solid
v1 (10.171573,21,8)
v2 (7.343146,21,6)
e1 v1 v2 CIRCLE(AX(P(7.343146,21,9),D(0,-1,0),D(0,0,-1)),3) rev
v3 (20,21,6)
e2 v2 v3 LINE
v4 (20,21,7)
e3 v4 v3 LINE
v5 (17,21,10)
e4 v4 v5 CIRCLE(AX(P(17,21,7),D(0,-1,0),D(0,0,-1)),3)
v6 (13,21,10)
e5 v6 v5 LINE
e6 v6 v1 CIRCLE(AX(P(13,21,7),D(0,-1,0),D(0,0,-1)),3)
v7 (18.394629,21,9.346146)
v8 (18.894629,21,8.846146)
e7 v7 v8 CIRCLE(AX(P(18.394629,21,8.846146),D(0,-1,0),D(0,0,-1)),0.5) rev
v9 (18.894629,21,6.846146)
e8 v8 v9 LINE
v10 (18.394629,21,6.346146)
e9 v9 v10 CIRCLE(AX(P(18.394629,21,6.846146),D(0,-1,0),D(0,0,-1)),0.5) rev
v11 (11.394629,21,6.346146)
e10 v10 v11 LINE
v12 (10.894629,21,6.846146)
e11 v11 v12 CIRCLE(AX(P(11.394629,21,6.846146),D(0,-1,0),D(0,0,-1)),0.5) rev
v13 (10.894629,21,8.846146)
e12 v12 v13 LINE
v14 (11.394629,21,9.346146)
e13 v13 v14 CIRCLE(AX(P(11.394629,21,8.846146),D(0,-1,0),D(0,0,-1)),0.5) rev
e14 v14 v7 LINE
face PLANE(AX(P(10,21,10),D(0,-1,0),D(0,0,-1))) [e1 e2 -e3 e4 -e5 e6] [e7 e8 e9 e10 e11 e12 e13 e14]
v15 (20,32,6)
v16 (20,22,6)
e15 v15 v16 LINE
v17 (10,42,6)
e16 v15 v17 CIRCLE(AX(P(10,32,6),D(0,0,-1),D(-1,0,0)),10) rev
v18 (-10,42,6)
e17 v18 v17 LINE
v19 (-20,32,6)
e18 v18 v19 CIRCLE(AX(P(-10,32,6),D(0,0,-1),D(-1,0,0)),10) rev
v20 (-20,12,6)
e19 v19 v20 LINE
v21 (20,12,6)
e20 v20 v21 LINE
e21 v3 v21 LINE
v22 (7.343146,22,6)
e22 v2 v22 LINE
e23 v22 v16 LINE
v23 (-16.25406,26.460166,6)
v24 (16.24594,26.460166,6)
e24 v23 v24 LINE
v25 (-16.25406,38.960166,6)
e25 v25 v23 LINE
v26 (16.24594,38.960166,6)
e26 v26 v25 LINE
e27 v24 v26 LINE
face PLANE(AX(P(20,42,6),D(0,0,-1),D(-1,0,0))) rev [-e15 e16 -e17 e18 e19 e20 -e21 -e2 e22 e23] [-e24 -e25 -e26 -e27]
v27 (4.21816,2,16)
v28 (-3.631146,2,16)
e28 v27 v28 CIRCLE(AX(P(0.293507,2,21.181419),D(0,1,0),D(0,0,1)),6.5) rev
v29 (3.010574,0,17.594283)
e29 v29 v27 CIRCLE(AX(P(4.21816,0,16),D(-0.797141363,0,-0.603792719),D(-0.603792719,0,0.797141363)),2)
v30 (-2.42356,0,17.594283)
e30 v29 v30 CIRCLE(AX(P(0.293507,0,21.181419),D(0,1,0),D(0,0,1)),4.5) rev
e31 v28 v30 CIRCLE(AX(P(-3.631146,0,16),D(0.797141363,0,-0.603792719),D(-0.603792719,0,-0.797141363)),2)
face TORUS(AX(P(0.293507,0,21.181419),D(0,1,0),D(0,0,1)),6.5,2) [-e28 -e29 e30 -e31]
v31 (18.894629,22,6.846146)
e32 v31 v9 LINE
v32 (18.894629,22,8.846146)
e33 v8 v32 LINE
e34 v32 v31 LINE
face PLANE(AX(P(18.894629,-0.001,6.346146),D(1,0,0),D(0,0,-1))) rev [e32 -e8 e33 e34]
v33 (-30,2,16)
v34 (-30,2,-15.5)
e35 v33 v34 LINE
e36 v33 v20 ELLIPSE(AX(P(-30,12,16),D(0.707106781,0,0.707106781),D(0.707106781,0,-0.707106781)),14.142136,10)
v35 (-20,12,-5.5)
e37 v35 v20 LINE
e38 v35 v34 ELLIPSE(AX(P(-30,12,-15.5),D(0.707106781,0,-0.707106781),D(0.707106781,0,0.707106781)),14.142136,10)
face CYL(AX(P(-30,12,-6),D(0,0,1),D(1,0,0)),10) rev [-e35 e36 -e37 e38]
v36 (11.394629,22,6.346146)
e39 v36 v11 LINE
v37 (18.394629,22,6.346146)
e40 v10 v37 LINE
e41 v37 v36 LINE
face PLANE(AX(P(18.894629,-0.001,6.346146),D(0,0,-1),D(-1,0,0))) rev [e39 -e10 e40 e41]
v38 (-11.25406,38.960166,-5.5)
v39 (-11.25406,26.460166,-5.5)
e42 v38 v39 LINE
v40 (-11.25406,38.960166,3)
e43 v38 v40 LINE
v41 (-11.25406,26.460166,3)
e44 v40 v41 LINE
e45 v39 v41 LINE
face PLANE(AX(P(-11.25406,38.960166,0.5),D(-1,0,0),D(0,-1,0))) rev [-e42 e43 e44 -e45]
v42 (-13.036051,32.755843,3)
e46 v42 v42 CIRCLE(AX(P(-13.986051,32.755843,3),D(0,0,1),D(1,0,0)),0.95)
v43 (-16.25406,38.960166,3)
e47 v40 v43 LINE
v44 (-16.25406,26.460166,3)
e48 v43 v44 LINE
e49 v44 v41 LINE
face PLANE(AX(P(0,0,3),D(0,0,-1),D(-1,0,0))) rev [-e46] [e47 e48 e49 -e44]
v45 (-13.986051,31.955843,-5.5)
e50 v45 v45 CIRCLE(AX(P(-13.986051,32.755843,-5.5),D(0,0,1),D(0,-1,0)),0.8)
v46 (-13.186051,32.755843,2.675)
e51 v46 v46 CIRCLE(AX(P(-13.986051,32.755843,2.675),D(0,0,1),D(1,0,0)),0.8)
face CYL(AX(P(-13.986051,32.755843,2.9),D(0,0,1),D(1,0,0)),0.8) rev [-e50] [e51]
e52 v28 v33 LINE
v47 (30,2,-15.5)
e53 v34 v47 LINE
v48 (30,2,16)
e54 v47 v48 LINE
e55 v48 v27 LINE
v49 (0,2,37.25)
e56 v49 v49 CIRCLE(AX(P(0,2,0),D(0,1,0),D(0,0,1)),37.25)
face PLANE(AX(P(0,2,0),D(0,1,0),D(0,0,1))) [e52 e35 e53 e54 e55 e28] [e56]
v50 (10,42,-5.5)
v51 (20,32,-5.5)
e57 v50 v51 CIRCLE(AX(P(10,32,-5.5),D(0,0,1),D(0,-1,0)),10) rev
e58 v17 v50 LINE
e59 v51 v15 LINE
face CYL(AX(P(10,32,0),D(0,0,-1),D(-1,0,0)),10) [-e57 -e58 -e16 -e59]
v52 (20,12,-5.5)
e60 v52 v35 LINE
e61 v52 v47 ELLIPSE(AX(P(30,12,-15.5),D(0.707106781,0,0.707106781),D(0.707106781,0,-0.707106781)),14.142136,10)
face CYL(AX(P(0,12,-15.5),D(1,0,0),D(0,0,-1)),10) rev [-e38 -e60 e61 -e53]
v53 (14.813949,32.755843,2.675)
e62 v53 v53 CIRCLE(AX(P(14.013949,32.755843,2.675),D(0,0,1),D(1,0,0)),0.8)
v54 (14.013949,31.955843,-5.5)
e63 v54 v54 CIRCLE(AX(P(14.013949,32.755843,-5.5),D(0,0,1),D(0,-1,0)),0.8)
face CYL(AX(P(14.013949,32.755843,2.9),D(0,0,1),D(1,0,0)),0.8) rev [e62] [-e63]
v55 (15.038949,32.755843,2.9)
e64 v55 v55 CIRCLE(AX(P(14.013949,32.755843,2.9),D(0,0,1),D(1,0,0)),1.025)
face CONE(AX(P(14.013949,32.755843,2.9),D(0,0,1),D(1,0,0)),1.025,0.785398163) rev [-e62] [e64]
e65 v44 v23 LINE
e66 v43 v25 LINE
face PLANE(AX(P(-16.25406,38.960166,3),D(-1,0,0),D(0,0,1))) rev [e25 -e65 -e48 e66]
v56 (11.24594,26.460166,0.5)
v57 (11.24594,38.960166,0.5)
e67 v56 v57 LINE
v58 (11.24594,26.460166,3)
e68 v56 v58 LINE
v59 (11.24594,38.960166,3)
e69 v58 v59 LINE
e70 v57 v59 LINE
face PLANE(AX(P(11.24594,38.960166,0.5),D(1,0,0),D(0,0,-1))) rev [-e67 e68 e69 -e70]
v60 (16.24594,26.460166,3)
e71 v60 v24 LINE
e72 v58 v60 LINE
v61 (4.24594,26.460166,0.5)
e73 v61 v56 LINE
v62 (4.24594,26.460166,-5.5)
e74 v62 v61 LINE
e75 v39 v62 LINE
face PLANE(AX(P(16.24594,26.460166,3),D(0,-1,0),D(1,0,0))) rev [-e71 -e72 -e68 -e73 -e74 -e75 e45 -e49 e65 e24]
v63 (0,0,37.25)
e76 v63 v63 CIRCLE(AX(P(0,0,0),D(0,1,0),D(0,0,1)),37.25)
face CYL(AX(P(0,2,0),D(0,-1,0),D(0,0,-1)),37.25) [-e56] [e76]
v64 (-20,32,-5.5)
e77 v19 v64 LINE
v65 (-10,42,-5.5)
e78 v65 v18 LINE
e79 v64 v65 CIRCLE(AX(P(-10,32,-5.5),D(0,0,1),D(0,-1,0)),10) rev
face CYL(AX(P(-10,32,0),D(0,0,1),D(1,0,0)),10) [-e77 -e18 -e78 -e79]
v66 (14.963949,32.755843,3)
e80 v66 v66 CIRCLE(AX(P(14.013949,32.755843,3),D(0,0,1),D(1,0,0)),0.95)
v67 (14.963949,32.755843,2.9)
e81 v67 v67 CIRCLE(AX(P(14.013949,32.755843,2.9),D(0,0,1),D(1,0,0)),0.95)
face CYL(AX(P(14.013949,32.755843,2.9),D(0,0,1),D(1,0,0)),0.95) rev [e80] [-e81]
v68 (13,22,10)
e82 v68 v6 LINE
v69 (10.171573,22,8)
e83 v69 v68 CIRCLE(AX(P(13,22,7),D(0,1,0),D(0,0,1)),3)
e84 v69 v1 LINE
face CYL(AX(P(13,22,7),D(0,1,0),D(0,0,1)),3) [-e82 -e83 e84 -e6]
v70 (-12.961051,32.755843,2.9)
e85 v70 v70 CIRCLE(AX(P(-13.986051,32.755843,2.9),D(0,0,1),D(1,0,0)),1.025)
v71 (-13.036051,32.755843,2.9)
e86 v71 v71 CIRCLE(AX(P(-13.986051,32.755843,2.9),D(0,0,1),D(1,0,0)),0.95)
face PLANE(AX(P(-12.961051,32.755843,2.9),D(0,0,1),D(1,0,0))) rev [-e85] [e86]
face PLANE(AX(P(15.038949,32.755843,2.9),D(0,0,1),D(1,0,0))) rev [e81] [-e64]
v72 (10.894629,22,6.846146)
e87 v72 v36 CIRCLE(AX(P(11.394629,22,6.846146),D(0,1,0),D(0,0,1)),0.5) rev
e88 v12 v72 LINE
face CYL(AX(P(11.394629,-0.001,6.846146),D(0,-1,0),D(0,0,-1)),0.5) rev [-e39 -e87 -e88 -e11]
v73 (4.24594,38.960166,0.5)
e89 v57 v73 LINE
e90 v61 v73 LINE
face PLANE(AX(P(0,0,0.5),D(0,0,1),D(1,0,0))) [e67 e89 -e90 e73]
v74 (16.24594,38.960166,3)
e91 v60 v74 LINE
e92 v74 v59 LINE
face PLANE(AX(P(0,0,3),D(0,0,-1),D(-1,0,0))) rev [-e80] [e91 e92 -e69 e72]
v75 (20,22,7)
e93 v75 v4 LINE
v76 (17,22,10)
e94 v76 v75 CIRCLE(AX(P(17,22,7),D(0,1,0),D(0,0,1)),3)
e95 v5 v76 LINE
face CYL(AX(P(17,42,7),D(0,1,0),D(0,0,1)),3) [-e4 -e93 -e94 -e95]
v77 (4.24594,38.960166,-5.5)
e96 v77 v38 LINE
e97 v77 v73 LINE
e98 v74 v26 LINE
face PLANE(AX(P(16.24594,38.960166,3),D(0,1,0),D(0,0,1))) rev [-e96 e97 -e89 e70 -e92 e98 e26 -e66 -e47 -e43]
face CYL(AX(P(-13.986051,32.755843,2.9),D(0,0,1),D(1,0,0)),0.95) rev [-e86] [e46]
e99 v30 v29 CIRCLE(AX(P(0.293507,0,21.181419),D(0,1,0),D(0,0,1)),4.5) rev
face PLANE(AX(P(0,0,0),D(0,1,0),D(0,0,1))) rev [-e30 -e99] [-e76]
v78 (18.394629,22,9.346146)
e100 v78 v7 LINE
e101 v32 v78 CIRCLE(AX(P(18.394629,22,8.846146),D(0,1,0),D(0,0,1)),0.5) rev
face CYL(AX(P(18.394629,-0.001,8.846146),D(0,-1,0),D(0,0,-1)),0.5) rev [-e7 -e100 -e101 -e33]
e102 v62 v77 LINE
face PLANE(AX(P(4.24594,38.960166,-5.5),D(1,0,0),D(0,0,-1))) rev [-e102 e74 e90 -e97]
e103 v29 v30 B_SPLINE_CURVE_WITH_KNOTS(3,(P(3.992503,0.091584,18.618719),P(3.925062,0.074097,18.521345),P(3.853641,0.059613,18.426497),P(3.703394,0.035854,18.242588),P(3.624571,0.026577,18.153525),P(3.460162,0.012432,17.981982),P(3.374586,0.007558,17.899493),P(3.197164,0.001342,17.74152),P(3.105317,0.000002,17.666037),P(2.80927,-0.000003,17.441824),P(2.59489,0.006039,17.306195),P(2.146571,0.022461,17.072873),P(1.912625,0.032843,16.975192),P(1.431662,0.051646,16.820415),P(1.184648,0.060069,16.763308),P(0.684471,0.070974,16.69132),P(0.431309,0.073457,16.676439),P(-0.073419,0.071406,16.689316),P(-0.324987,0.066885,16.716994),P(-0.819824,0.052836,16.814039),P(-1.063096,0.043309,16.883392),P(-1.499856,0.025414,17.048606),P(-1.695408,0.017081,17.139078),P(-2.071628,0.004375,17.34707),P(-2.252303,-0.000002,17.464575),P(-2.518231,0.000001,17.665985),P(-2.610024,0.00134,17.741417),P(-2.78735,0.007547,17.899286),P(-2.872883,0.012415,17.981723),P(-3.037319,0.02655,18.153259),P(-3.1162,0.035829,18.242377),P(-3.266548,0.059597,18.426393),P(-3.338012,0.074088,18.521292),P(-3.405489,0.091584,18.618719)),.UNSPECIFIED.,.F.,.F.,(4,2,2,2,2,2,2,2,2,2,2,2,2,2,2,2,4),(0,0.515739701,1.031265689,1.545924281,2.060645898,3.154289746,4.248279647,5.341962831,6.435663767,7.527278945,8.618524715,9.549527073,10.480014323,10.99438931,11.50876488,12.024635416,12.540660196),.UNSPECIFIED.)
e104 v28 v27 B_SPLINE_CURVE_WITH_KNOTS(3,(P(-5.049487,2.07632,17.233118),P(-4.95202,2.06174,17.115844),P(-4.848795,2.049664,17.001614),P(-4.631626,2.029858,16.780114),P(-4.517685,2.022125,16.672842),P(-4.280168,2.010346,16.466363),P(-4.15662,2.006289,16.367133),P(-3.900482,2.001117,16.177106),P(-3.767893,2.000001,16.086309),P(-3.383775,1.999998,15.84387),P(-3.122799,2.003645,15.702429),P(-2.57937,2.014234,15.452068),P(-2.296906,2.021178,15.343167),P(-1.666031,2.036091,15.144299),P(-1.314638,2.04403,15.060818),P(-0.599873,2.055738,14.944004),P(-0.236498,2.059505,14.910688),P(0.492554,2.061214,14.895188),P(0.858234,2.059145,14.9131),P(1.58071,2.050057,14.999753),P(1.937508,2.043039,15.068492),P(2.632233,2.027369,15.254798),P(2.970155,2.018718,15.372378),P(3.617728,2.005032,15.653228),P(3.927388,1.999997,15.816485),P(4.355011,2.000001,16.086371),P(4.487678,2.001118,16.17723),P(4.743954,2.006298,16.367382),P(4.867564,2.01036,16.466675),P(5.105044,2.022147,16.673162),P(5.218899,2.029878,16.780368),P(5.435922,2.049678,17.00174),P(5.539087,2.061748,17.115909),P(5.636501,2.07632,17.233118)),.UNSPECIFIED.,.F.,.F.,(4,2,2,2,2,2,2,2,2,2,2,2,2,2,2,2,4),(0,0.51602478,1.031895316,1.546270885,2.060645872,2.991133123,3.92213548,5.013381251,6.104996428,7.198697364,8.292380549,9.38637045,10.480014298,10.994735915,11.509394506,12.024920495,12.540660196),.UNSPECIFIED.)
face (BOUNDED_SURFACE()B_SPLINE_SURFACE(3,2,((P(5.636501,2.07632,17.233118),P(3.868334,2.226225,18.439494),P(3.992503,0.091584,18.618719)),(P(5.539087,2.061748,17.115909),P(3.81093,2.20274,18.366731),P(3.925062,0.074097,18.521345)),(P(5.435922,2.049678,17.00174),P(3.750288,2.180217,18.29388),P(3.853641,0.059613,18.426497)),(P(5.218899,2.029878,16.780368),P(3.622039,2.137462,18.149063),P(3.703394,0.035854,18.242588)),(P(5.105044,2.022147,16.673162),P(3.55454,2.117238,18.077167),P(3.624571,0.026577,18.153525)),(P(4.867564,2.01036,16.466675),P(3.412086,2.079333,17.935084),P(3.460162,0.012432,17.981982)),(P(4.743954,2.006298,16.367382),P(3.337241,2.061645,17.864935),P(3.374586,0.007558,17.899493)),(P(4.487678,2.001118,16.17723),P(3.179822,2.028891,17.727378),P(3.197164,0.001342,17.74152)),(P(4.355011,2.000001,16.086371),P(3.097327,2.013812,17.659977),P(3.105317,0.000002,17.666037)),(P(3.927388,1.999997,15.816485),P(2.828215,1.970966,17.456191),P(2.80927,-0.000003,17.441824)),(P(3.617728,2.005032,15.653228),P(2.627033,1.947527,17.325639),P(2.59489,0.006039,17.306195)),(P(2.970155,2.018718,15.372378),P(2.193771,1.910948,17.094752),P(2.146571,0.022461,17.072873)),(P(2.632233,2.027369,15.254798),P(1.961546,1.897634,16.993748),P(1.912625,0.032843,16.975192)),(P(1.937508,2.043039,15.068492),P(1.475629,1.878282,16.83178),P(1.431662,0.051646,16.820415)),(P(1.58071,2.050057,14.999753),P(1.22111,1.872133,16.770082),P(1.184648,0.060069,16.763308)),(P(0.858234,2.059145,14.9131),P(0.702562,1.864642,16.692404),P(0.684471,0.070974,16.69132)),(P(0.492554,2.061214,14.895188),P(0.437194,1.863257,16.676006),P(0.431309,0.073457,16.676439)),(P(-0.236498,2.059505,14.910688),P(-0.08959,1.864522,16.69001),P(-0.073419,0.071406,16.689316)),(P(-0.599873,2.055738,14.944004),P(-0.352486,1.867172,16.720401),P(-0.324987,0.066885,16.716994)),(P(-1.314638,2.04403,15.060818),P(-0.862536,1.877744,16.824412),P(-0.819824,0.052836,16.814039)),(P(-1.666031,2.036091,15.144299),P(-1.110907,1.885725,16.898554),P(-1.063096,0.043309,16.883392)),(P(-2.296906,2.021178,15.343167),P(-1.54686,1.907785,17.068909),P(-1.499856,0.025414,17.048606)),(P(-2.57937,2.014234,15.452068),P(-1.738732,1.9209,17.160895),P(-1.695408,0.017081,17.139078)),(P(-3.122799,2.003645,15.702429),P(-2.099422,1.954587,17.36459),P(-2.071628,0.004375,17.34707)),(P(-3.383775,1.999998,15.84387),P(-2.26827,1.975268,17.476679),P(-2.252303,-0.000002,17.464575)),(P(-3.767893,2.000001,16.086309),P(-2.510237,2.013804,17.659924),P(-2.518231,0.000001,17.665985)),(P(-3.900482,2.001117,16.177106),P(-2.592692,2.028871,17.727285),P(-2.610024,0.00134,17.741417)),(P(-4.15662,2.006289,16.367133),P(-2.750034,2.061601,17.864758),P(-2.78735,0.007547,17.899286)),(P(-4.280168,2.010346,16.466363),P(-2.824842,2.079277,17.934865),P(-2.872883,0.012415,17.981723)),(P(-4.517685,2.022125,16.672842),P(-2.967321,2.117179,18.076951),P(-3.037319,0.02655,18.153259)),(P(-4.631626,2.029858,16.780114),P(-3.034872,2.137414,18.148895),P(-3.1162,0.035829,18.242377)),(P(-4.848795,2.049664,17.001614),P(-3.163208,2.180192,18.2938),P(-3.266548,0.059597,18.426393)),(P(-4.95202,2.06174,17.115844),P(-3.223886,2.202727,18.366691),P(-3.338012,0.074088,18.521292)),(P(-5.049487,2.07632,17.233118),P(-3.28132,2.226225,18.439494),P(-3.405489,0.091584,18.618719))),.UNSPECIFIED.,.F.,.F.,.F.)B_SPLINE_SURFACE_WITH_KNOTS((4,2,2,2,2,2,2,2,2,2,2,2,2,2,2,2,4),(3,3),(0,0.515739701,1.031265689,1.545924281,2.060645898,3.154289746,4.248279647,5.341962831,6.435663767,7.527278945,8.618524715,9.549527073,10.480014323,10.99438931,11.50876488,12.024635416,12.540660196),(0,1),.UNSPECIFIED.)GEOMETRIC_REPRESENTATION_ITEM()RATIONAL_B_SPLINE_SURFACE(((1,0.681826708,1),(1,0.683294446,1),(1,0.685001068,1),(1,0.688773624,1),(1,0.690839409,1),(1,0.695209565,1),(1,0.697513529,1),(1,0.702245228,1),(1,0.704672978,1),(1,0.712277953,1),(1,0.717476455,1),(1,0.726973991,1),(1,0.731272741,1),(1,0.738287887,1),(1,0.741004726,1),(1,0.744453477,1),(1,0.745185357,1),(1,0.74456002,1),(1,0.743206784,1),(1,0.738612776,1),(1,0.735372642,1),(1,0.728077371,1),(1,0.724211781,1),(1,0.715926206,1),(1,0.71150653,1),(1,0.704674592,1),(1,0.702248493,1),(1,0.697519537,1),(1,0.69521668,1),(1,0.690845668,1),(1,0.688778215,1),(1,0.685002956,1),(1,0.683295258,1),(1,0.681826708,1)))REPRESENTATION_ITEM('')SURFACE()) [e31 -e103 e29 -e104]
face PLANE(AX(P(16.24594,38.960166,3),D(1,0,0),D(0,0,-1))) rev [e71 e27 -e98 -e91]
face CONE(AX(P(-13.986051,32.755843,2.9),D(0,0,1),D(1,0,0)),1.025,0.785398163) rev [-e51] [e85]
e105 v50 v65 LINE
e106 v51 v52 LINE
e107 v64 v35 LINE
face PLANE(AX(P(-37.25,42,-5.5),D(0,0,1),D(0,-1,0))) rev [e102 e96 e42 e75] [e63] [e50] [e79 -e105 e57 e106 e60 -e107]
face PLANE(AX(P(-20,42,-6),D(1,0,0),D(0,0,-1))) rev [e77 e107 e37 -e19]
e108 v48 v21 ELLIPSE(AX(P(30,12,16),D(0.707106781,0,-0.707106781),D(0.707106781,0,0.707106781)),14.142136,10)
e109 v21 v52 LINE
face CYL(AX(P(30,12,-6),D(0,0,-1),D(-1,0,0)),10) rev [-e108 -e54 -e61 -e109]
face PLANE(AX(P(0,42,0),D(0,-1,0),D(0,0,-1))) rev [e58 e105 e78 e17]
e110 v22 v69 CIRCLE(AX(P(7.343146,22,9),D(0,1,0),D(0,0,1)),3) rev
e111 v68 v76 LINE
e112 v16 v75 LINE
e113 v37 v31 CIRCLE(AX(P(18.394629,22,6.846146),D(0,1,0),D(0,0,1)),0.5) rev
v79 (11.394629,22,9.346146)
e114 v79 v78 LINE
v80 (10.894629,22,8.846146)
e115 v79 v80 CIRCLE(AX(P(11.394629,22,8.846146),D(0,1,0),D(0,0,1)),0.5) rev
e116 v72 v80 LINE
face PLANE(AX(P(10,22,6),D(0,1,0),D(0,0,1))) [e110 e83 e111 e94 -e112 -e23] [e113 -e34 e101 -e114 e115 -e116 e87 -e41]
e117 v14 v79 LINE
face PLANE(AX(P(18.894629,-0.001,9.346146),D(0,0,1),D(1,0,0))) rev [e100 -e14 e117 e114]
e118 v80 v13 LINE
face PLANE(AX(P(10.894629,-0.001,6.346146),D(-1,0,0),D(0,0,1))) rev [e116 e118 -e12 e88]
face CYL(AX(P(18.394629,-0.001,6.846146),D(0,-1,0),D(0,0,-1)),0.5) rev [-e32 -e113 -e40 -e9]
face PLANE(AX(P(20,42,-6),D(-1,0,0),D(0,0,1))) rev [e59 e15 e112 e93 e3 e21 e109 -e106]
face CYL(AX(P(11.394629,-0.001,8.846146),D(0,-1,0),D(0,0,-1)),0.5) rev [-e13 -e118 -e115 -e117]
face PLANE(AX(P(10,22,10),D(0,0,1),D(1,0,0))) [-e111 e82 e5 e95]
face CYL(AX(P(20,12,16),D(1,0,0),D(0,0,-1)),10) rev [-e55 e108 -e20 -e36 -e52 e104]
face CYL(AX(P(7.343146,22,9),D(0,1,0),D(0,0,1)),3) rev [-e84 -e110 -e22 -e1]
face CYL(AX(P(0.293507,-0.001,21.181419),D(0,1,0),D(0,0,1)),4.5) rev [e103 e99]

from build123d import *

# Parameters (mm, degrees)
SKETCH1_R                      = 37.25
BOSS_EXTRUDE1_DEPTH            = 2
SKETCH2_W                      = 40
SKETCH2_H                      = 12
BOSS_EXTRUDE4_DEPTH            = 40
SKETCH3_W                      = 32.5
SKETCH3_H                      = 12.5
CUT_EXTRUDE1_DEPTH             = 3
SKETCH4_W                      = 22.5
SKETCH4_H                      = 12.5
CUT_EXTRUDE2_DEPTH             = 2.5
SKETCH5_W                      = 15.5
SKETCH5_H                      = 12.5
CUT_EXTRUDE3_DEPTH             = 6
SKETCH6_W                      = 0.5
SKETCH6_H                      = 40
CUT_EXTRUDE4_DEPTH             = 81.181824624
SKETCH7_R                      = 0.95
CUT_EXTRUDE5_DEPTH             = 0.1
M2X0_4_TAPPED_HOLE1_AT_2_COUNT = 2
M2X0_4_TAPPED_HOLE1_AT_2_PITCH = 28
SKETCH11_W                     = 4
SKETCH11_H                     = 1
BOSS_EXTRUDE9_DEPTH            = 10
CUT_EXTRUDE6_REACH             = 59.089
SKETCH13_W                     = 8
SKETCH13_H                     = 3
FILLET4_R                      = 0.5
FILLET5_R                      = 3
FILLET6_R                      = 3
FILLET7_R                      = 10
FILLET8_R                      = 10
CUT_EXTRUDE7_REACH             = 68.145
SKETCH14_R                     = 4.5
FILLET10_R                     = 2


# Some blends are built 0.0001 mm under size
with BuildPart() as part:
    # Sketch1 → Boss-Extrude1 (new body)
    with BuildSketch(Plane(origin=(0, 0, 0), x_dir=(1, 0, 0), z_dir=(0, 1, 0))):
        with Locations(Location((0, 0, 0), (0, 0, 270))):
            Circle(SKETCH1_R)
    extrude(amount=BOSS_EXTRUDE1_DEPTH)

    # Sketch2 → Boss-Extrude4 (add)
    with BuildSketch(Plane(origin=(0, 2, 0), x_dir=(1, 0, 0), z_dir=(0, 1, 0))):
        Rectangle(SKETCH2_W, SKETCH2_H)
    extrude(amount=BOSS_EXTRUDE4_DEPTH)

    # Sketch3 → Cut-Extrude1 (cut)
    with BuildSketch(Plane.XY.offset(6)):
        with Locations((-0.004059612, 32.710166226)):
            Rectangle(SKETCH3_W, SKETCH3_H)
    extrude(amount=-CUT_EXTRUDE1_DEPTH, mode=Mode.SUBTRACT)

    # Sketch4 → Cut-Extrude2 (cut)
    with BuildSketch(Plane.XY.offset(3)):
        with Locations((-0.004059612, 32.710166226)):
            Rectangle(SKETCH4_W, SKETCH4_H)
    extrude(amount=-CUT_EXTRUDE2_DEPTH, mode=Mode.SUBTRACT)

    # Sketch5 → Cut-Extrude3 (cut)
    with BuildSketch(Plane.XY.offset(0.5)):
        with Locations((-3.504059612, 32.710166226)):
            Rectangle(SKETCH5_W, SKETCH5_H)
    extrude(amount=-CUT_EXTRUDE3_DEPTH, mode=Mode.SUBTRACT)

    # Sketch6 → Cut-Extrude4 (cut, through all)
    with BuildSketch(Plane(origin=(20, 0, 0), x_dir=(0, 0, -1), z_dir=(1, 0, 0))):
        with Locations((5.75, 22)):
            Rectangle(SKETCH6_W, SKETCH6_H)
    extrude(amount=-CUT_EXTRUDE4_DEPTH, mode=Mode.SUBTRACT)

    # Sketch7 → Cut-Extrude5 (cut)
    with BuildSketch(Plane.XY.offset(3)):
        with Locations((14.013948706, 32.755843114)):
            Circle(SKETCH7_R)
        with Locations((-13.986051294, 32.755843114)):
            Circle(SKETCH7_R)
    extrude(amount=-CUT_EXTRUDE5_DEPTH, mode=Mode.SUBTRACT)

    # Sketch9 → M2x0.4 Tapped Hole1 (revolve, cut)
    with BuildSketch(Plane(origin=(-13.986051294, 32.755843114, 2.9), x_dir=(0, -1, 0), z_dir=(1, 0, 0))):
        Polygon((0, 0), (0, 40.15), (0.8, 40.15), (0.8, 0.225), (1.025, 0), align=None)
    m2x0_4_tapped_hole1 = revolve(axis=Axis((-13.986051294, 32.755843114, 9.25), (0, 0, -1)), mode=Mode.SUBTRACT)

    # M2x0.4 Tapped Hole1 at 2: M2x0.4 Tapped Hole1 ×2
    with Locations(*[(i * M2X0_4_TAPPED_HOLE1_AT_2_PITCH, 0, 0) for i in range(1, M2X0_4_TAPPED_HOLE1_AT_2_COUNT)]):
        add(m2x0_4_tapped_hole1, mode=Mode.SUBTRACT)

    # Sketch11 → Boss-Extrude9 (add)
    with BuildSketch(Plane(origin=(20, 0, 0), x_dir=(0, 0, -1), z_dir=(1, 0, 0))):
        with Locations((-8, 21.5)):
            Rectangle(SKETCH11_W, SKETCH11_H)
    extrude(amount=-BOSS_EXTRUDE9_DEPTH)

    # Sketch13 → Cut-Extrude6 (cut, up to next)
    with BuildSketch(Plane(origin=(0, 22, 0), x_dir=(1, 0, 0), z_dir=(0, 1, 0)), mode=Mode.PRIVATE) as cut_extrude6_sk1:
        with Locations((14.894629289, -7.846146156)):
            Rectangle(SKETCH13_W, SKETCH13_H)
    cut_extrude6_tool1 = extrude(cut_extrude6_sk1.sketch, amount=-CUT_EXTRUDE6_REACH, mode=Mode.PRIVATE) & part.part
    add(cut_extrude6_tool1.solids().sort_by_distance((14.894629, 22, 7.846146))[0], mode=Mode.SUBTRACT)

    # Fillet4
    fillet4_edges = [part.edges().sort_by_distance(p)[0] for p in [
        (10.894629289, 21.5, 6.346146156),
        (10.894629289, 21.5, 9.346146156),
        (18.894629289, 21.5, 9.346146156),
        (18.894629289, 21.5, 6.346146156),
    ]]
    fillet(fillet4_edges, radius=FILLET4_R)

    # Fillet5
    fillet5_edges = [part.edges().sort_by_distance(p)[0] for p in [
        (10, 21.5, 10),
        (20, 21.5, 10),
    ]]
    fillet(fillet5_edges, radius=FILLET5_R)

    # Fillet6
    # the kernel refuses this fillet: 3 mm, written as the material it adds along each edge
    with BuildSketch(Plane(origin=(10, 21, 6), x_dir=(0.08547250469841872, 5.30956894242523e-15, 0.9963405296085164), z_dir=(0, 1, 0))) as fillet6_piece_1:
        with BuildLine():
            CenterArc((2.761933602, -2.903549084), FILLET6_R, 104.568024357, 70.528779366)
            Line((-0.227087987, -2.64713157), (-0.525990146, -2.621489819))
            Line((-0.525990146, -2.621489819), (-0.298902159, 0.025641751))
            Line((-0.298902159, 0.025641751), (0.025641751, 0.298902159))
            ThreePointArc((0.025641751, 0.298902159), (1.021982281, 0.213429654), (1.931887045, 0.290354908))
            Line((1.931887045, 0.290354908), (2.007345823, 0))
        make_face()
    extrude(amount=1)

    # Fillet7
    fillet7_edges = [part.edges().sort_by_distance(p)[0] for p in [
        (-20, 2, 0.25),
        (0, 2, -5.5),
        (0, 2, 6),
        (20, 2, 0.25),
    ]]
    fillet(fillet7_edges, radius=FILLET7_R)

    # Fillet8
    fillet8_edges = [part.edges().sort_by_distance(p)[0] for p in [
        (-20, 42, 0.25),
        (20, 42, 0.25),
    ]]
    fillet(fillet8_edges, radius=FILLET8_R)

    # Sketch14 → Cut-Extrude7 (cut, up to next)
    with BuildSketch(Plane(origin=(0, 2, 0), x_dir=(1, 0, 0), z_dir=(0, 1, 0)), mode=Mode.PRIVATE) as cut_extrude7_sk1:
        with Locations(Location((0.293506959, -21.181418859, 0), (0, 0, 270))):
            Circle(SKETCH14_R)
    cut_extrude7_tool1 = extrude(cut_extrude7_sk1.sketch, amount=-CUT_EXTRUDE7_REACH, mode=Mode.PRIVATE) & part.part
    add(cut_extrude7_tool1.solids().sort_by_distance((0.293507, 2, 21.181419))[0], mode=Mode.SUBTRACT)

    # Fillet10
    fillet10_edges = [part.edges().sort_by_distance(p)[0] for p in [
        (0.293506959, 2, 16.681418859),
    ]]
    fillet(fillet10_edges, radius=FILLET10_R - 0.0001)  # a hair under: the kernel refuses the full size


solid = part.part
